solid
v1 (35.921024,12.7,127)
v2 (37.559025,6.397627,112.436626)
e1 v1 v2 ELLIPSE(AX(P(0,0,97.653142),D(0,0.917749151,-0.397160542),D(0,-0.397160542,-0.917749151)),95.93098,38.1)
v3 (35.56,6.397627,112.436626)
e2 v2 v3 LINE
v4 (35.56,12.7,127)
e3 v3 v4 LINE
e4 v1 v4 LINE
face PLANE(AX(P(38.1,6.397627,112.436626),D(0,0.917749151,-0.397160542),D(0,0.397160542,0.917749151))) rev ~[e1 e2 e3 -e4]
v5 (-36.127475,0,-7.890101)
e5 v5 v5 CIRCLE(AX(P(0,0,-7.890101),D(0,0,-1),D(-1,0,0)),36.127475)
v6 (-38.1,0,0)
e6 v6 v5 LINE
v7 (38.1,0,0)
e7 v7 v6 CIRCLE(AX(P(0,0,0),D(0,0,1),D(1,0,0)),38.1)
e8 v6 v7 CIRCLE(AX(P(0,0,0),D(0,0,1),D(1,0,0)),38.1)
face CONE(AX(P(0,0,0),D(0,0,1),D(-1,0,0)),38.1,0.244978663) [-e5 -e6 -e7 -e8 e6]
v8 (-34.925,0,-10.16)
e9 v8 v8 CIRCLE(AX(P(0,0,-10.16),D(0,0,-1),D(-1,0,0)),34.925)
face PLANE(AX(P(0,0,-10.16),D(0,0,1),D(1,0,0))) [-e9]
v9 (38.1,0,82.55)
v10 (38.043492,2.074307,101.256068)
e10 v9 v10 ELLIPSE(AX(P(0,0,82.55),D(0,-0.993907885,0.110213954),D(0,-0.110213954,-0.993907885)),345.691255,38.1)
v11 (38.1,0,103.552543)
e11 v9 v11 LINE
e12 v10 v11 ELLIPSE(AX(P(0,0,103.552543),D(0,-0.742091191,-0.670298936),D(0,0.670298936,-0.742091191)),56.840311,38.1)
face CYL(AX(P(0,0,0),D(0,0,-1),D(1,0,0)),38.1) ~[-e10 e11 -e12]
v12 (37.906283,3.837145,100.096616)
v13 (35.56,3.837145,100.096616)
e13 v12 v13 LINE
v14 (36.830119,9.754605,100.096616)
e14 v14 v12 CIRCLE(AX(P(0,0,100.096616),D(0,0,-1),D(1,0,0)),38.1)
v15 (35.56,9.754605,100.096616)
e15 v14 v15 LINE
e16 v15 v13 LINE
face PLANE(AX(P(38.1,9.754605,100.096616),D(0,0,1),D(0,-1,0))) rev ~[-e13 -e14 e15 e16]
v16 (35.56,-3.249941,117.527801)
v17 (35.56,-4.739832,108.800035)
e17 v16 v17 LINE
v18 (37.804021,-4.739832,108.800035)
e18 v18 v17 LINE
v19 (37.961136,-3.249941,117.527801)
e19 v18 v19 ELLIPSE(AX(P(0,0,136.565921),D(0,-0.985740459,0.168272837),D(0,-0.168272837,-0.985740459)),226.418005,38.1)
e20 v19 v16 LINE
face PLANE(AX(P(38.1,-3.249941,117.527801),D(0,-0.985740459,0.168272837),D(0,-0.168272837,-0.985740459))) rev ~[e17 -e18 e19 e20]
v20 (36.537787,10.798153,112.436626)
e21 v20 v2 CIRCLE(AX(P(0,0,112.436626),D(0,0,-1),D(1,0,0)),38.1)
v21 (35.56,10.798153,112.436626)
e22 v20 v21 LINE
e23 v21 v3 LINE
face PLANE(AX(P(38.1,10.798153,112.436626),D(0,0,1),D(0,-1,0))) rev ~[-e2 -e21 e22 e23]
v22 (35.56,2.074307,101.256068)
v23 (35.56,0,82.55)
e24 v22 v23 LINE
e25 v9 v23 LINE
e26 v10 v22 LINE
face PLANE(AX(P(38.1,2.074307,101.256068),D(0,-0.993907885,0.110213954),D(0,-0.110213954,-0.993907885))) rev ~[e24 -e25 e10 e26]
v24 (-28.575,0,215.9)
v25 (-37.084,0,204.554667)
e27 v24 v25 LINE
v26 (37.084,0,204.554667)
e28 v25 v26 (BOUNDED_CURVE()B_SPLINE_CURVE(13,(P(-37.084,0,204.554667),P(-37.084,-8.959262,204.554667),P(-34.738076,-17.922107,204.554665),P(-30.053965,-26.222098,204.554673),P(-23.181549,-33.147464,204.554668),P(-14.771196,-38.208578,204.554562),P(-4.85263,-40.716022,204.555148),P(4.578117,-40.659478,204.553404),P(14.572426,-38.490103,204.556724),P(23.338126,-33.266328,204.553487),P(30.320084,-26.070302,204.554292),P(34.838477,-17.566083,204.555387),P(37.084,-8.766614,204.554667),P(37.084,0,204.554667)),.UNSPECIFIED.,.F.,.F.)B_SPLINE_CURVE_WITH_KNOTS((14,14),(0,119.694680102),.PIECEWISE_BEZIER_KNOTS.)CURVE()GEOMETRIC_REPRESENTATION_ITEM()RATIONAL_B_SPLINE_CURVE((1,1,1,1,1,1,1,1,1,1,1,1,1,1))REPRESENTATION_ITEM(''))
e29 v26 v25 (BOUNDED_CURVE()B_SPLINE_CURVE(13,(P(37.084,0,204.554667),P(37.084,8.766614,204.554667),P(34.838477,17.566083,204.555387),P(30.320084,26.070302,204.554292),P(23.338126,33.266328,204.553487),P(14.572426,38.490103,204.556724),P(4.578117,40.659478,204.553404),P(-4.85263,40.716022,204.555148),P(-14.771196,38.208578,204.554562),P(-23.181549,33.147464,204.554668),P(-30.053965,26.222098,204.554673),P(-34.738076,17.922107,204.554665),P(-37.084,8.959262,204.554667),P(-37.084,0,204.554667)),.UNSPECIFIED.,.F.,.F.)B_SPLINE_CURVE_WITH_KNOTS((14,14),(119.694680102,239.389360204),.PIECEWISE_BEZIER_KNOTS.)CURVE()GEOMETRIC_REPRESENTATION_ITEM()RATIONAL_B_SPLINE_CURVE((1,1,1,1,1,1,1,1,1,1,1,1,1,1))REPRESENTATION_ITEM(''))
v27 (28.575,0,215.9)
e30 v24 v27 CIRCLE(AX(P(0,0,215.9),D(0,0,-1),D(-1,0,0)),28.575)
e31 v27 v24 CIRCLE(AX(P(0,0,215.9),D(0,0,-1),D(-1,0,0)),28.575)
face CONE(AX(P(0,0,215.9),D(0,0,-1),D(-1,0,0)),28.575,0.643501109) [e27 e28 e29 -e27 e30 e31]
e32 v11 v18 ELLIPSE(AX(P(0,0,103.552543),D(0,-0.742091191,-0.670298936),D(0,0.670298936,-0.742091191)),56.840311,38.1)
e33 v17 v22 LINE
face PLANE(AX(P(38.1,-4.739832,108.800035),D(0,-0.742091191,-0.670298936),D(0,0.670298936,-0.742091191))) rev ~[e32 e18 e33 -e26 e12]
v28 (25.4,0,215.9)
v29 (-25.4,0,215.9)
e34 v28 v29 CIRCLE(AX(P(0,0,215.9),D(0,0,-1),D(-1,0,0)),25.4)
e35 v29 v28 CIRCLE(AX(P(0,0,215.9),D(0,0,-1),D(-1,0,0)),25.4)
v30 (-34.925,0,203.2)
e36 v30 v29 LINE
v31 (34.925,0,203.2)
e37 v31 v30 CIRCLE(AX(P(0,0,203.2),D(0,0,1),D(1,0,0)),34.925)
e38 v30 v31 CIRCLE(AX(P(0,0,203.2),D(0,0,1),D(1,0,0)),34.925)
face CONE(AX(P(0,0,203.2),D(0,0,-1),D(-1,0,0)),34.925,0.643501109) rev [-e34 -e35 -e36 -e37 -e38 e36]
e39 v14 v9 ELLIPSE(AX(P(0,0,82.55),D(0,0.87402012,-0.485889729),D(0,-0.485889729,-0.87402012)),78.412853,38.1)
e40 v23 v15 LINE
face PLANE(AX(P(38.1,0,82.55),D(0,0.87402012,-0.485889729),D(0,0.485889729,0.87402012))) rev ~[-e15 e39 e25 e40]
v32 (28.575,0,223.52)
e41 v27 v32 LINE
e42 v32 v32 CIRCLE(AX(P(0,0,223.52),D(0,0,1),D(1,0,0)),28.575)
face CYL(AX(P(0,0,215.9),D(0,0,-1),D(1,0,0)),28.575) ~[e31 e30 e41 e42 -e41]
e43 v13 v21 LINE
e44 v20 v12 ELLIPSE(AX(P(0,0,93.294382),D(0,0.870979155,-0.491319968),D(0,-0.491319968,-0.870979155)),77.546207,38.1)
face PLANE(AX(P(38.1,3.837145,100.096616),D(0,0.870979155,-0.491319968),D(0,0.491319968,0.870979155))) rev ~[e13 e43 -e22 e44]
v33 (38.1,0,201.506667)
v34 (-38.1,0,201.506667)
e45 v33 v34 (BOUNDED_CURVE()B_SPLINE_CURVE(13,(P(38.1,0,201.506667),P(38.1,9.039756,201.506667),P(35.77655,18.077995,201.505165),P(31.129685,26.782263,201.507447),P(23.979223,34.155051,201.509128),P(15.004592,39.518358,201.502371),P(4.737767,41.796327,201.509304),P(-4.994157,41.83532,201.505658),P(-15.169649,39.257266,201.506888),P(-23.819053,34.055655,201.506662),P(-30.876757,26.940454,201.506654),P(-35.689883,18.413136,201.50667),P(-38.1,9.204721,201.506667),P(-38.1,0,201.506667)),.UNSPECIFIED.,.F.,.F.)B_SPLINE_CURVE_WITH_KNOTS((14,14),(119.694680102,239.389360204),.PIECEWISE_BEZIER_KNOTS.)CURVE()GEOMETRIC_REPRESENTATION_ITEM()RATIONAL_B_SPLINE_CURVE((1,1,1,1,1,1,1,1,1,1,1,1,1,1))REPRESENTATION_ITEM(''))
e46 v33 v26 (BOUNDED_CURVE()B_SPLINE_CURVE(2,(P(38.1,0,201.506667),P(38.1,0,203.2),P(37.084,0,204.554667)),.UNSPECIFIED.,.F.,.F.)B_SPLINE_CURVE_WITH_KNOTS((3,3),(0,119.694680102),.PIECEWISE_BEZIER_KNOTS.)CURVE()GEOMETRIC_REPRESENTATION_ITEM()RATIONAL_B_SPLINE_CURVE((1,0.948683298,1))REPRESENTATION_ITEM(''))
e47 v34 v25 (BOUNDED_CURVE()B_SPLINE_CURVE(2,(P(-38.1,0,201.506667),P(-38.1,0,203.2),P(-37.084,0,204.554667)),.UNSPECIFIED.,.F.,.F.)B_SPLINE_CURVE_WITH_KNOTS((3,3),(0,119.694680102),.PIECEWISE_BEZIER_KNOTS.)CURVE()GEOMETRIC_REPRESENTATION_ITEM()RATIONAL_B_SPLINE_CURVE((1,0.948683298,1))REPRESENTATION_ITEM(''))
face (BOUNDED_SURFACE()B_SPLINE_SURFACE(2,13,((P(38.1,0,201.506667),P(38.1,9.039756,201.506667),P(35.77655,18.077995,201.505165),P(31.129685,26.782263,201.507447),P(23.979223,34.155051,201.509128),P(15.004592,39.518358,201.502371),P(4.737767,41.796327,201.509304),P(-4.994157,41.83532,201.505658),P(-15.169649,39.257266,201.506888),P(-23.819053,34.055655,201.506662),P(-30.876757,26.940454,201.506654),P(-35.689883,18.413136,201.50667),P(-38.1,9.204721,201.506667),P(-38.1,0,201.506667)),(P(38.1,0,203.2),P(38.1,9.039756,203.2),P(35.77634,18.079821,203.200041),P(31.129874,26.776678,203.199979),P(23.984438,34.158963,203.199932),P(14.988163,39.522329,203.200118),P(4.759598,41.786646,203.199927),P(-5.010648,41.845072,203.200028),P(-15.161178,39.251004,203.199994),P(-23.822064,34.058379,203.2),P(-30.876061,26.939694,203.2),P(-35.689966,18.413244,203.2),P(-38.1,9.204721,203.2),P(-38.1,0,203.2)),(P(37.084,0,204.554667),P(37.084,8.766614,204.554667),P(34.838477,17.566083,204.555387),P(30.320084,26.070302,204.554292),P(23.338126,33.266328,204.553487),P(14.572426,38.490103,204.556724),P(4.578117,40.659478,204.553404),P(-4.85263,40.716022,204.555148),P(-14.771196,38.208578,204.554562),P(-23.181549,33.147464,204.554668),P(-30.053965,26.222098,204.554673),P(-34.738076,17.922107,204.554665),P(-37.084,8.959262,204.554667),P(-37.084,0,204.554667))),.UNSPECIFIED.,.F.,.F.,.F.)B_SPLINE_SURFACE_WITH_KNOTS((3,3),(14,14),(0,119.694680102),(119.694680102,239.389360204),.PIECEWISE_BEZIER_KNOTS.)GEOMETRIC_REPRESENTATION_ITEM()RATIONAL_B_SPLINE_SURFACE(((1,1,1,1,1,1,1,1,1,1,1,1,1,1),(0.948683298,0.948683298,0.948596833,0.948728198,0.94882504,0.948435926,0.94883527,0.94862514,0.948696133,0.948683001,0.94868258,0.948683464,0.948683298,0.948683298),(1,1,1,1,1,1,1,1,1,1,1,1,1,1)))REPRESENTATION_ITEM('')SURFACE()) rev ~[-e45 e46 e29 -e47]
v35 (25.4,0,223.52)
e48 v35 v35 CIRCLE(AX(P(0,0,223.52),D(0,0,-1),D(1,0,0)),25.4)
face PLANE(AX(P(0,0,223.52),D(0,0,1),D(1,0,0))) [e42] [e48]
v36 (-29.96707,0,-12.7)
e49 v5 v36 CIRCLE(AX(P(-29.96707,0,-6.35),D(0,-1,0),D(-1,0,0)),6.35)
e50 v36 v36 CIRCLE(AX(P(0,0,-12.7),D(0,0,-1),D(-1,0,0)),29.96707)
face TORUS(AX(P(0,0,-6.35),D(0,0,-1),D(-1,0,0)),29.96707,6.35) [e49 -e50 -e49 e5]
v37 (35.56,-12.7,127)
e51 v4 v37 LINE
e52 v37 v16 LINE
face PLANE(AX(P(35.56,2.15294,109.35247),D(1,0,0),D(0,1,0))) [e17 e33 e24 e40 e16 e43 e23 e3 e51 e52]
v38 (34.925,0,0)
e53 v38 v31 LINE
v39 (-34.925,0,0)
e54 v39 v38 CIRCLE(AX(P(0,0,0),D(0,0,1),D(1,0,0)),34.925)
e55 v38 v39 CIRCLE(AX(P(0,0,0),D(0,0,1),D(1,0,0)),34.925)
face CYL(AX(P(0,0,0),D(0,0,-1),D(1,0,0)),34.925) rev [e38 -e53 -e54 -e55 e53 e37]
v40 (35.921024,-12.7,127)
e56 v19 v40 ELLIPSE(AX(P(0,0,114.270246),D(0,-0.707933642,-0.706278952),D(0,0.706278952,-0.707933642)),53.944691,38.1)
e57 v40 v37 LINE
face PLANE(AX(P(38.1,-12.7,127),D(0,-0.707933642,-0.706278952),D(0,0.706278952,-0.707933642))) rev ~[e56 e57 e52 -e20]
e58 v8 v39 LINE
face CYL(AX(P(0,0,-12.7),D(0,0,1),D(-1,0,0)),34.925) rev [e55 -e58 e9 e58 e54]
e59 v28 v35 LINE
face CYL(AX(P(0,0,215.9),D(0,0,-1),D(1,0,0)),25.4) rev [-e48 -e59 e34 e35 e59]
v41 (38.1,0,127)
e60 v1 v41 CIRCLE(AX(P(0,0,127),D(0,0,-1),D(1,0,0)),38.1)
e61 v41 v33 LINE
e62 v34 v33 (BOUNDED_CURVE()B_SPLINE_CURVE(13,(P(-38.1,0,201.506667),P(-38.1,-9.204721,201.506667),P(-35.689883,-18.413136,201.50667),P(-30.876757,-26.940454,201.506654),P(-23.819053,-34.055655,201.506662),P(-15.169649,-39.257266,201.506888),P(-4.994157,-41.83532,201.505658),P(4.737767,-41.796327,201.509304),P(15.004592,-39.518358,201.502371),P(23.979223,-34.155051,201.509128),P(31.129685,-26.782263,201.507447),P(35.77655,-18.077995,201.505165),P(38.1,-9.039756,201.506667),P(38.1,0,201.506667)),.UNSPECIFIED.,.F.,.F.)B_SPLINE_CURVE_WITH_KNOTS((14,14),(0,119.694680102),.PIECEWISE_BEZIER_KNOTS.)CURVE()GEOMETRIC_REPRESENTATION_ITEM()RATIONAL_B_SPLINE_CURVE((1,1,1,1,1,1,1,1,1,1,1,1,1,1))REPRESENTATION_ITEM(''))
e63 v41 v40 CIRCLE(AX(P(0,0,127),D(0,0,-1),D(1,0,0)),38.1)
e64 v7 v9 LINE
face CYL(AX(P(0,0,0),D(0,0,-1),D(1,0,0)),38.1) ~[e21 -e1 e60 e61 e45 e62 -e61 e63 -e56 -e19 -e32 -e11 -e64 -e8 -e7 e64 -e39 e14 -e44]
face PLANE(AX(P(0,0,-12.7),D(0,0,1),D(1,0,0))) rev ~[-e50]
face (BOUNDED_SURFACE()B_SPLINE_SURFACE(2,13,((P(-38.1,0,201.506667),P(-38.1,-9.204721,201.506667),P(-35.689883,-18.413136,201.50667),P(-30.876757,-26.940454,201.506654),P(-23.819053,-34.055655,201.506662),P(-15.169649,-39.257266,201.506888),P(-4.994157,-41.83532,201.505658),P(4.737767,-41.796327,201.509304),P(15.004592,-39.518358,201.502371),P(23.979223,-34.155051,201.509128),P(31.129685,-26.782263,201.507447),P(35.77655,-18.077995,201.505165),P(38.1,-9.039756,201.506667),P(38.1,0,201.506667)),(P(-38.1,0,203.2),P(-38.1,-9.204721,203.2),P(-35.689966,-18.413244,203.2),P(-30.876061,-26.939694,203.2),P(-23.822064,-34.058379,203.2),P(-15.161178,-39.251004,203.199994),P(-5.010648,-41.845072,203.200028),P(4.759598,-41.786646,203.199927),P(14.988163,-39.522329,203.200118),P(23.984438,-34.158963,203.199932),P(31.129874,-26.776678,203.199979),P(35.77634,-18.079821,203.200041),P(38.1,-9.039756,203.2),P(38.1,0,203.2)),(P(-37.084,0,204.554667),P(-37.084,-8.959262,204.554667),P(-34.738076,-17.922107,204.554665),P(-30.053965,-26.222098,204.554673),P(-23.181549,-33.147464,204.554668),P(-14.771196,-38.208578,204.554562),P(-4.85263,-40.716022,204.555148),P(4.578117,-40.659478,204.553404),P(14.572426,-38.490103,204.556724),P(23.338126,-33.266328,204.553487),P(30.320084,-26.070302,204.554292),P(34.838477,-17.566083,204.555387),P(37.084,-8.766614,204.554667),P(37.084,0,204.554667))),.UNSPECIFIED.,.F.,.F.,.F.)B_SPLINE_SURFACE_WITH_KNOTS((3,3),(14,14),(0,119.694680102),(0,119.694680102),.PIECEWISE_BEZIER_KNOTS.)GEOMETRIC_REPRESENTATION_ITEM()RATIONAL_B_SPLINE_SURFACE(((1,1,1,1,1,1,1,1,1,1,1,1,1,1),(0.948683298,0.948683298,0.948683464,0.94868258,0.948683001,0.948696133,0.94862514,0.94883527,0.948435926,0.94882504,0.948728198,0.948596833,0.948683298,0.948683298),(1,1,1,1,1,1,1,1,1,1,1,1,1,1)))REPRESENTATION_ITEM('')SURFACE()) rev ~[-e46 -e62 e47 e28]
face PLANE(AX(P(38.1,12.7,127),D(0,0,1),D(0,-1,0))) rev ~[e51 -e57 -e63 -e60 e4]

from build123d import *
from build123d import SkipClean  # not in build123d's __all__

# Parameters (mm, degrees)
F0_R      = 38.1
F0_R_2    = 34.925
F1_DEPTH  = 203.2
F3_R      = 34.925
F7_DEPTH  = 2.54
F9_R      = 28.575
F13_DEPTH = 7.62
F10_R     = 25.4
F14_DEPTH = 25.4
F15_R     = 6.35
F16_R     = 5.08
F19_DEPTH = 2.54


with BuildPart() as f1:
    # F0 (on Top) → F1 (new body)
    with BuildSketch(Plane.XY):
        Circle(F0_R)
        Circle(F0_R_2, mode=Mode.SUBTRACT)
    extrude(amount=F1_DEPTH)

    # F4 (on Front) → F6 (revolve)
    with BuildSketch(Plane.XZ):
        Polygon((-38.1, 0), (-34.925, -12.7), (-34.925, 0), align=None)
    revolve(axis=Axis((0, 0, -6.35), (0, 0, -1)))

    # F3 (on offset) → F7 (join)
    with BuildSketch(Plane.XY.offset(-12.7)):
        Circle(F3_R)
    extrude(amount=F7_DEPTH)

    # F11 (on Front) → F12 (revolve)
    with BuildSketch(Plane.XZ):
        Polygon((-25.4, 215.9), (-28.575, 215.9), (-38.1, 203.2), (-34.925, 203.2), align=None)
    revolve(axis=Axis((0, 0, 209.55), (0, 0, -1)))

    # F9 (on offset) → F13 (join)
    with BuildSketch(Plane.XY.offset(215.9)):
        Circle(F9_R)
    extrude(amount=F13_DEPTH)

    # F10 (on offset) → F14 (cut)
    with BuildSketch(Plane.XY.offset(215.9)):
        Circle(F10_R)
    extrude(amount=F14_DEPTH, mode=Mode.SUBTRACT)

    # F15
    f15_edges = [f1.edges().sort_by_distance(p)[0] for p in [
        (34.925, 0, -12.7),
    ]]
    fillet(f15_edges, radius=F15_R)

    # F16
    f16_edges = [f1.edges().sort_by_distance(p)[0] for p in [
        (0, -38.1, 203.2),
        (0, 38.1, 203.2),
    ]]
    fillet(f16_edges, radius=F16_R)

    # F18 (on offset) → F19 (cut)
    with BuildSketch(Plane.YZ.offset(38.1)):
        Polygon((0, 127), (-12.7, 127), (-3.2499410816, 117.5278012156), (-4.7398322865, 108.8000346422), (2.0743066773, 101.2560684681), (0, 82.55), (9.75460466, 100.0966164947), (3.8371453993, 100.0966164947), (10.7981534675, 112.4366257071), (6.3976268284, 112.4366257071), (12.7, 127), align=None)
    with SkipClean():  # cleaning this boolean's faces spoils the solid; the shape is the same uncleaned
        extrude(amount=-F19_DEPTH, mode=Mode.SUBTRACT)


solid = f1.part
